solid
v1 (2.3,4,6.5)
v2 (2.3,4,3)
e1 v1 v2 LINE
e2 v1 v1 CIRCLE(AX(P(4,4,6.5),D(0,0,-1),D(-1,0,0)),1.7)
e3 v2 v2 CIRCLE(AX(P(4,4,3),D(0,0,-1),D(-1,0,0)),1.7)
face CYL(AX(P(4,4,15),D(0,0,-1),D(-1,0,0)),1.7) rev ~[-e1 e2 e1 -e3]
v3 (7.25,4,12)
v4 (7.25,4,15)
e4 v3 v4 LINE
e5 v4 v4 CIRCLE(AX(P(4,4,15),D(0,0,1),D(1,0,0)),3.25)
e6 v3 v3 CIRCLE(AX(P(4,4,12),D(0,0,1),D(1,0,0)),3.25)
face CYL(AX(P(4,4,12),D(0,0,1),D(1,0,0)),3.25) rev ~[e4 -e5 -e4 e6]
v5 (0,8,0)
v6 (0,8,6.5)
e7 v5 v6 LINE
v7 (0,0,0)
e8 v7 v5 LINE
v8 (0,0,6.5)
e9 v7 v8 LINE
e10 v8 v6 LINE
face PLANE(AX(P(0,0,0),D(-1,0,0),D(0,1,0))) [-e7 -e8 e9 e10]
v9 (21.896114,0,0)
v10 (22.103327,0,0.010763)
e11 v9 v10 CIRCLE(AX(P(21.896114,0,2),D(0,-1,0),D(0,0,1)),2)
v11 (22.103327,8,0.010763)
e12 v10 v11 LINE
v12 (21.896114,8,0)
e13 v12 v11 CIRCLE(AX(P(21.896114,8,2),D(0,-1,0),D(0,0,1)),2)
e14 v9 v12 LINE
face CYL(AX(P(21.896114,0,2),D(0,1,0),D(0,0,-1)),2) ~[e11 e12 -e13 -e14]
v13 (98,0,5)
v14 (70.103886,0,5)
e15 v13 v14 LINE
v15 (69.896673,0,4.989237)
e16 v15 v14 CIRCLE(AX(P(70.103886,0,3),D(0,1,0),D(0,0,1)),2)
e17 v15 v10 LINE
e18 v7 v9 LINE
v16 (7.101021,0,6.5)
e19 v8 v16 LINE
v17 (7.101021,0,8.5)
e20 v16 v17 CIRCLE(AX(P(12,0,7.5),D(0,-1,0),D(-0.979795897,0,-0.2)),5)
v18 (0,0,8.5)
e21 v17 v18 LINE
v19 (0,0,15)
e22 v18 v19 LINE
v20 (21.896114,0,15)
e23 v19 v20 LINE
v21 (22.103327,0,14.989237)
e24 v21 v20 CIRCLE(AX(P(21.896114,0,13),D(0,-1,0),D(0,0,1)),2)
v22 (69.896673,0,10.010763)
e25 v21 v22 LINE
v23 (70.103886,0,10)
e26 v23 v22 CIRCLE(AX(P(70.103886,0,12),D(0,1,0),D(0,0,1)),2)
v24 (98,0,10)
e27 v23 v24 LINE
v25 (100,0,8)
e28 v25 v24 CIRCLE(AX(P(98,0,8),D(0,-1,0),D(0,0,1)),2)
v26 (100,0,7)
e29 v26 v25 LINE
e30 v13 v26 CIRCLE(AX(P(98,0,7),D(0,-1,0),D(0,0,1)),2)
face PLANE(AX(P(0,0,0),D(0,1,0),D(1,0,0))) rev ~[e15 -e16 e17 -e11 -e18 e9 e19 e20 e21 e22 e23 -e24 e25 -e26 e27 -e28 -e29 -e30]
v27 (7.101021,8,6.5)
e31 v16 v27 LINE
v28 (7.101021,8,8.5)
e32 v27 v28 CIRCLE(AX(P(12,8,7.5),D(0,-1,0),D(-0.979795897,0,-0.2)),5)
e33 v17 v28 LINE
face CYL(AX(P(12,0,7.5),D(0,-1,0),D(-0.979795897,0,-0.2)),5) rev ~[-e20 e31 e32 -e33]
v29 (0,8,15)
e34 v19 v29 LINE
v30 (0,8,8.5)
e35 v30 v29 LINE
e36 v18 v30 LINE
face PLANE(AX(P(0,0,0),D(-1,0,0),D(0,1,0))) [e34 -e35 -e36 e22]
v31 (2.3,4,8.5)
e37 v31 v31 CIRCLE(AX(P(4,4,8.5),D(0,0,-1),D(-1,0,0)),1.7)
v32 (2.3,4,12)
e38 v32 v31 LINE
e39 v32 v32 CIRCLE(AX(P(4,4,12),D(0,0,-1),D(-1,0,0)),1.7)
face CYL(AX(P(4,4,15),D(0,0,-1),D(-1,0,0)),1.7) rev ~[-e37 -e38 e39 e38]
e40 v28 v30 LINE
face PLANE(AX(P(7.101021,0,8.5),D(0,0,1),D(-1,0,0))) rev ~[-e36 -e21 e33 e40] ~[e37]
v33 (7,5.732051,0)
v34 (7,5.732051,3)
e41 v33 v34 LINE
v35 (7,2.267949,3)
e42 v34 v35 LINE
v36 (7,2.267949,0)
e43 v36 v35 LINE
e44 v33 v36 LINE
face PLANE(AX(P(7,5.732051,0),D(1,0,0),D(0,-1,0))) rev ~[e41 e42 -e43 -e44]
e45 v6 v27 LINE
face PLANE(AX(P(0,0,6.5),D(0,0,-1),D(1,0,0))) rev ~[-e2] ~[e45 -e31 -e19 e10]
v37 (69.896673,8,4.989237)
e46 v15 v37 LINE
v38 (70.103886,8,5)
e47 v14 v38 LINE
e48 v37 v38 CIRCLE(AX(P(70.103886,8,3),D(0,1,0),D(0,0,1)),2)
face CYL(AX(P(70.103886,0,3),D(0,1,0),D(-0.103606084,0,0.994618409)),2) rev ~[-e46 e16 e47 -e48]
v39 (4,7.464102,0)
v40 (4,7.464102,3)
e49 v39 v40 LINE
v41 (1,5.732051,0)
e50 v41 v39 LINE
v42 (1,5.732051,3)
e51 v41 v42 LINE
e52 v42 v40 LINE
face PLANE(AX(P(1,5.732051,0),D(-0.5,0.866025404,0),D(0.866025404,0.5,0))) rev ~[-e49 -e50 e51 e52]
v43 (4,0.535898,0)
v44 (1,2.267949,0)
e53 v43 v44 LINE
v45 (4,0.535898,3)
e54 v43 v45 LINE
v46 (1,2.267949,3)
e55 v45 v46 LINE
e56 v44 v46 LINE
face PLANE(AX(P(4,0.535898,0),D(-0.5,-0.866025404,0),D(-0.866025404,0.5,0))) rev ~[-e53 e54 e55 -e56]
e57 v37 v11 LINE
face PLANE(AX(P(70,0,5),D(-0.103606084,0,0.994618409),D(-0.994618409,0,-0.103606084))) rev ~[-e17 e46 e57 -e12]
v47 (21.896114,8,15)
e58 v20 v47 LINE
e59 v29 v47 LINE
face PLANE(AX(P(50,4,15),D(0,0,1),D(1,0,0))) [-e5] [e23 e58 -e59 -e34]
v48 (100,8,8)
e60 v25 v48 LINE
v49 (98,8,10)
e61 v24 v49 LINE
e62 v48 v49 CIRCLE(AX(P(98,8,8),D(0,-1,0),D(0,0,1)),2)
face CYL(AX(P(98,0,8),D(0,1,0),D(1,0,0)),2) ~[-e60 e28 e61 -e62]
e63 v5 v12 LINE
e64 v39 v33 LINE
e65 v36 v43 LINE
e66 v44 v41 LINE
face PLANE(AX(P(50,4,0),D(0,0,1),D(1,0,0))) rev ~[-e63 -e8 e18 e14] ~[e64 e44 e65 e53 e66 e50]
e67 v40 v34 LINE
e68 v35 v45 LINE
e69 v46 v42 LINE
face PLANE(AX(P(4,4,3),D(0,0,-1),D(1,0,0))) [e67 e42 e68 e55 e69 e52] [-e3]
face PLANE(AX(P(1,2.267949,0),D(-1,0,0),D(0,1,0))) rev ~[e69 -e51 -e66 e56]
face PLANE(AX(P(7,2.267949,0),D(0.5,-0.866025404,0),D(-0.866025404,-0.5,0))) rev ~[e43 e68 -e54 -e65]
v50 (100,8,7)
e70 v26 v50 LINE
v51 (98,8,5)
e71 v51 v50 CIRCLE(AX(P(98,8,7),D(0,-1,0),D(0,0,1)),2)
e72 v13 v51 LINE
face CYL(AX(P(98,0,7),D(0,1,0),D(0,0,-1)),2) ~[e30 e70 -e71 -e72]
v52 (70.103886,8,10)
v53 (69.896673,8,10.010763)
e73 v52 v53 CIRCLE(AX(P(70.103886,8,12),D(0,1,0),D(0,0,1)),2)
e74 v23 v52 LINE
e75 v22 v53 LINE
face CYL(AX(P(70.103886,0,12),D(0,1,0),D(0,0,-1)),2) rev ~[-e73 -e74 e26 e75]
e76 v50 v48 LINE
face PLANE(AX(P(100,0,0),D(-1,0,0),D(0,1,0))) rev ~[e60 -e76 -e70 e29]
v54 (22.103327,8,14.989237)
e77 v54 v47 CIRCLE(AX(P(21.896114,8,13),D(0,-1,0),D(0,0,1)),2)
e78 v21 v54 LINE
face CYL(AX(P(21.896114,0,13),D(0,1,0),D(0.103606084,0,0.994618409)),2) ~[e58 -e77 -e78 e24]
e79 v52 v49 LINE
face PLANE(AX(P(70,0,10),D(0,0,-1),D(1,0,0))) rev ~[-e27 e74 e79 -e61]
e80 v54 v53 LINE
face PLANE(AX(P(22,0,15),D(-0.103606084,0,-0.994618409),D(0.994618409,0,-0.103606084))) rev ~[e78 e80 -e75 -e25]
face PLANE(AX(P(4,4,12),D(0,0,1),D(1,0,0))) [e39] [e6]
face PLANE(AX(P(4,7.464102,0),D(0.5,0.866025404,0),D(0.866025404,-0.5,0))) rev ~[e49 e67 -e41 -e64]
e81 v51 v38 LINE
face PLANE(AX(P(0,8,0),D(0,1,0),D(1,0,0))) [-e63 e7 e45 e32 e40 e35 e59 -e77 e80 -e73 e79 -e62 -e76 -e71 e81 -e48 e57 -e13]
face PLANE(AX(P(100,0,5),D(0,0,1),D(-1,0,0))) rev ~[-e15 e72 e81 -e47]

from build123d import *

# Parameters (mm, degrees)
F0_W           = 100
F0_H           = 8
F1_DEPTH       = 15
F3_DEPTH       = 8
F5_DEPTH       = 3
F7_D           = 3.4
F7_DEPTH       = 15
F7_CBORE_D     = 6.5
F7_CBORE_DEPTH = 3
F7_TIP         = 1.0214630523
F8_R           = 2


# Not quite as in the source:
# - a feature names something its author has since deleted; it is built from what else it names


with BuildPart() as f1:
    # F0 (on Top) → F1 (new body)
    with BuildSketch(Plane.XY):
        with Locations((50, 4)):
            Rectangle(F0_W, F0_H)
    extrude(amount=F1_DEPTH)

    # F2 (on face) → F3 (cut, through all)
    with BuildSketch(Plane.XZ):
        Polygon((70, 5), (22, 0), (100, 0), (100, 5), align=None)
        with BuildLine():
            Line((0, 6.5), (7.1010205144, 6.5))
            ThreePointArc((7.1010205144, 6.5), (17, 7.5), (7.1010205144, 8.5))
            Line((7.1010205144, 8.5), (0, 8.5))
            Line((0, 8.5), (0, 6.5))
        make_face()
        Polygon((100, 15), (22, 15), (70, 10), (100, 10), align=None)
    extrude(amount=-F3_DEPTH, mode=Mode.SUBTRACT)

    # F4 (on face) → F5 (cut)
    with BuildSketch(Plane(origin=(0, 0, 0), x_dir=(1, 0, 0), z_dir=(0, 0, -1))):
        Polygon((4, -7.4641016151), (7, -5.7320508076), (7, -2.2679491924), (4, -0.5358983849), (1, -2.2679491924), (1, -5.7320508076), align=None)
    extrude(amount=-F5_DEPTH, mode=Mode.SUBTRACT)

    # F7
    with Locations(Plane.XY.offset(15)):
        with Locations((4, 4)):
            CounterBoreHole(F7_D / 2, F7_CBORE_D / 2, F7_CBORE_DEPTH, depth=F7_DEPTH)
            with Locations((0, 0, -(F7_DEPTH + F7_TIP / 2))):  # 118° drill point
                Cone(0, F7_D / 2, F7_TIP, mode=Mode.SUBTRACT)

    # F8
    f8_edges = [f1.edges().sort_by_distance(p)[0] for p in [
        (100, 4, 10),
        (100, 4, 5),
        (70, 4, 5),
        (70, 4, 10),
        (22, 4, 15),
        (22, 4, 0),
    ]]
    fillet(f8_edges, radius=F8_R)


solid = f1.part
